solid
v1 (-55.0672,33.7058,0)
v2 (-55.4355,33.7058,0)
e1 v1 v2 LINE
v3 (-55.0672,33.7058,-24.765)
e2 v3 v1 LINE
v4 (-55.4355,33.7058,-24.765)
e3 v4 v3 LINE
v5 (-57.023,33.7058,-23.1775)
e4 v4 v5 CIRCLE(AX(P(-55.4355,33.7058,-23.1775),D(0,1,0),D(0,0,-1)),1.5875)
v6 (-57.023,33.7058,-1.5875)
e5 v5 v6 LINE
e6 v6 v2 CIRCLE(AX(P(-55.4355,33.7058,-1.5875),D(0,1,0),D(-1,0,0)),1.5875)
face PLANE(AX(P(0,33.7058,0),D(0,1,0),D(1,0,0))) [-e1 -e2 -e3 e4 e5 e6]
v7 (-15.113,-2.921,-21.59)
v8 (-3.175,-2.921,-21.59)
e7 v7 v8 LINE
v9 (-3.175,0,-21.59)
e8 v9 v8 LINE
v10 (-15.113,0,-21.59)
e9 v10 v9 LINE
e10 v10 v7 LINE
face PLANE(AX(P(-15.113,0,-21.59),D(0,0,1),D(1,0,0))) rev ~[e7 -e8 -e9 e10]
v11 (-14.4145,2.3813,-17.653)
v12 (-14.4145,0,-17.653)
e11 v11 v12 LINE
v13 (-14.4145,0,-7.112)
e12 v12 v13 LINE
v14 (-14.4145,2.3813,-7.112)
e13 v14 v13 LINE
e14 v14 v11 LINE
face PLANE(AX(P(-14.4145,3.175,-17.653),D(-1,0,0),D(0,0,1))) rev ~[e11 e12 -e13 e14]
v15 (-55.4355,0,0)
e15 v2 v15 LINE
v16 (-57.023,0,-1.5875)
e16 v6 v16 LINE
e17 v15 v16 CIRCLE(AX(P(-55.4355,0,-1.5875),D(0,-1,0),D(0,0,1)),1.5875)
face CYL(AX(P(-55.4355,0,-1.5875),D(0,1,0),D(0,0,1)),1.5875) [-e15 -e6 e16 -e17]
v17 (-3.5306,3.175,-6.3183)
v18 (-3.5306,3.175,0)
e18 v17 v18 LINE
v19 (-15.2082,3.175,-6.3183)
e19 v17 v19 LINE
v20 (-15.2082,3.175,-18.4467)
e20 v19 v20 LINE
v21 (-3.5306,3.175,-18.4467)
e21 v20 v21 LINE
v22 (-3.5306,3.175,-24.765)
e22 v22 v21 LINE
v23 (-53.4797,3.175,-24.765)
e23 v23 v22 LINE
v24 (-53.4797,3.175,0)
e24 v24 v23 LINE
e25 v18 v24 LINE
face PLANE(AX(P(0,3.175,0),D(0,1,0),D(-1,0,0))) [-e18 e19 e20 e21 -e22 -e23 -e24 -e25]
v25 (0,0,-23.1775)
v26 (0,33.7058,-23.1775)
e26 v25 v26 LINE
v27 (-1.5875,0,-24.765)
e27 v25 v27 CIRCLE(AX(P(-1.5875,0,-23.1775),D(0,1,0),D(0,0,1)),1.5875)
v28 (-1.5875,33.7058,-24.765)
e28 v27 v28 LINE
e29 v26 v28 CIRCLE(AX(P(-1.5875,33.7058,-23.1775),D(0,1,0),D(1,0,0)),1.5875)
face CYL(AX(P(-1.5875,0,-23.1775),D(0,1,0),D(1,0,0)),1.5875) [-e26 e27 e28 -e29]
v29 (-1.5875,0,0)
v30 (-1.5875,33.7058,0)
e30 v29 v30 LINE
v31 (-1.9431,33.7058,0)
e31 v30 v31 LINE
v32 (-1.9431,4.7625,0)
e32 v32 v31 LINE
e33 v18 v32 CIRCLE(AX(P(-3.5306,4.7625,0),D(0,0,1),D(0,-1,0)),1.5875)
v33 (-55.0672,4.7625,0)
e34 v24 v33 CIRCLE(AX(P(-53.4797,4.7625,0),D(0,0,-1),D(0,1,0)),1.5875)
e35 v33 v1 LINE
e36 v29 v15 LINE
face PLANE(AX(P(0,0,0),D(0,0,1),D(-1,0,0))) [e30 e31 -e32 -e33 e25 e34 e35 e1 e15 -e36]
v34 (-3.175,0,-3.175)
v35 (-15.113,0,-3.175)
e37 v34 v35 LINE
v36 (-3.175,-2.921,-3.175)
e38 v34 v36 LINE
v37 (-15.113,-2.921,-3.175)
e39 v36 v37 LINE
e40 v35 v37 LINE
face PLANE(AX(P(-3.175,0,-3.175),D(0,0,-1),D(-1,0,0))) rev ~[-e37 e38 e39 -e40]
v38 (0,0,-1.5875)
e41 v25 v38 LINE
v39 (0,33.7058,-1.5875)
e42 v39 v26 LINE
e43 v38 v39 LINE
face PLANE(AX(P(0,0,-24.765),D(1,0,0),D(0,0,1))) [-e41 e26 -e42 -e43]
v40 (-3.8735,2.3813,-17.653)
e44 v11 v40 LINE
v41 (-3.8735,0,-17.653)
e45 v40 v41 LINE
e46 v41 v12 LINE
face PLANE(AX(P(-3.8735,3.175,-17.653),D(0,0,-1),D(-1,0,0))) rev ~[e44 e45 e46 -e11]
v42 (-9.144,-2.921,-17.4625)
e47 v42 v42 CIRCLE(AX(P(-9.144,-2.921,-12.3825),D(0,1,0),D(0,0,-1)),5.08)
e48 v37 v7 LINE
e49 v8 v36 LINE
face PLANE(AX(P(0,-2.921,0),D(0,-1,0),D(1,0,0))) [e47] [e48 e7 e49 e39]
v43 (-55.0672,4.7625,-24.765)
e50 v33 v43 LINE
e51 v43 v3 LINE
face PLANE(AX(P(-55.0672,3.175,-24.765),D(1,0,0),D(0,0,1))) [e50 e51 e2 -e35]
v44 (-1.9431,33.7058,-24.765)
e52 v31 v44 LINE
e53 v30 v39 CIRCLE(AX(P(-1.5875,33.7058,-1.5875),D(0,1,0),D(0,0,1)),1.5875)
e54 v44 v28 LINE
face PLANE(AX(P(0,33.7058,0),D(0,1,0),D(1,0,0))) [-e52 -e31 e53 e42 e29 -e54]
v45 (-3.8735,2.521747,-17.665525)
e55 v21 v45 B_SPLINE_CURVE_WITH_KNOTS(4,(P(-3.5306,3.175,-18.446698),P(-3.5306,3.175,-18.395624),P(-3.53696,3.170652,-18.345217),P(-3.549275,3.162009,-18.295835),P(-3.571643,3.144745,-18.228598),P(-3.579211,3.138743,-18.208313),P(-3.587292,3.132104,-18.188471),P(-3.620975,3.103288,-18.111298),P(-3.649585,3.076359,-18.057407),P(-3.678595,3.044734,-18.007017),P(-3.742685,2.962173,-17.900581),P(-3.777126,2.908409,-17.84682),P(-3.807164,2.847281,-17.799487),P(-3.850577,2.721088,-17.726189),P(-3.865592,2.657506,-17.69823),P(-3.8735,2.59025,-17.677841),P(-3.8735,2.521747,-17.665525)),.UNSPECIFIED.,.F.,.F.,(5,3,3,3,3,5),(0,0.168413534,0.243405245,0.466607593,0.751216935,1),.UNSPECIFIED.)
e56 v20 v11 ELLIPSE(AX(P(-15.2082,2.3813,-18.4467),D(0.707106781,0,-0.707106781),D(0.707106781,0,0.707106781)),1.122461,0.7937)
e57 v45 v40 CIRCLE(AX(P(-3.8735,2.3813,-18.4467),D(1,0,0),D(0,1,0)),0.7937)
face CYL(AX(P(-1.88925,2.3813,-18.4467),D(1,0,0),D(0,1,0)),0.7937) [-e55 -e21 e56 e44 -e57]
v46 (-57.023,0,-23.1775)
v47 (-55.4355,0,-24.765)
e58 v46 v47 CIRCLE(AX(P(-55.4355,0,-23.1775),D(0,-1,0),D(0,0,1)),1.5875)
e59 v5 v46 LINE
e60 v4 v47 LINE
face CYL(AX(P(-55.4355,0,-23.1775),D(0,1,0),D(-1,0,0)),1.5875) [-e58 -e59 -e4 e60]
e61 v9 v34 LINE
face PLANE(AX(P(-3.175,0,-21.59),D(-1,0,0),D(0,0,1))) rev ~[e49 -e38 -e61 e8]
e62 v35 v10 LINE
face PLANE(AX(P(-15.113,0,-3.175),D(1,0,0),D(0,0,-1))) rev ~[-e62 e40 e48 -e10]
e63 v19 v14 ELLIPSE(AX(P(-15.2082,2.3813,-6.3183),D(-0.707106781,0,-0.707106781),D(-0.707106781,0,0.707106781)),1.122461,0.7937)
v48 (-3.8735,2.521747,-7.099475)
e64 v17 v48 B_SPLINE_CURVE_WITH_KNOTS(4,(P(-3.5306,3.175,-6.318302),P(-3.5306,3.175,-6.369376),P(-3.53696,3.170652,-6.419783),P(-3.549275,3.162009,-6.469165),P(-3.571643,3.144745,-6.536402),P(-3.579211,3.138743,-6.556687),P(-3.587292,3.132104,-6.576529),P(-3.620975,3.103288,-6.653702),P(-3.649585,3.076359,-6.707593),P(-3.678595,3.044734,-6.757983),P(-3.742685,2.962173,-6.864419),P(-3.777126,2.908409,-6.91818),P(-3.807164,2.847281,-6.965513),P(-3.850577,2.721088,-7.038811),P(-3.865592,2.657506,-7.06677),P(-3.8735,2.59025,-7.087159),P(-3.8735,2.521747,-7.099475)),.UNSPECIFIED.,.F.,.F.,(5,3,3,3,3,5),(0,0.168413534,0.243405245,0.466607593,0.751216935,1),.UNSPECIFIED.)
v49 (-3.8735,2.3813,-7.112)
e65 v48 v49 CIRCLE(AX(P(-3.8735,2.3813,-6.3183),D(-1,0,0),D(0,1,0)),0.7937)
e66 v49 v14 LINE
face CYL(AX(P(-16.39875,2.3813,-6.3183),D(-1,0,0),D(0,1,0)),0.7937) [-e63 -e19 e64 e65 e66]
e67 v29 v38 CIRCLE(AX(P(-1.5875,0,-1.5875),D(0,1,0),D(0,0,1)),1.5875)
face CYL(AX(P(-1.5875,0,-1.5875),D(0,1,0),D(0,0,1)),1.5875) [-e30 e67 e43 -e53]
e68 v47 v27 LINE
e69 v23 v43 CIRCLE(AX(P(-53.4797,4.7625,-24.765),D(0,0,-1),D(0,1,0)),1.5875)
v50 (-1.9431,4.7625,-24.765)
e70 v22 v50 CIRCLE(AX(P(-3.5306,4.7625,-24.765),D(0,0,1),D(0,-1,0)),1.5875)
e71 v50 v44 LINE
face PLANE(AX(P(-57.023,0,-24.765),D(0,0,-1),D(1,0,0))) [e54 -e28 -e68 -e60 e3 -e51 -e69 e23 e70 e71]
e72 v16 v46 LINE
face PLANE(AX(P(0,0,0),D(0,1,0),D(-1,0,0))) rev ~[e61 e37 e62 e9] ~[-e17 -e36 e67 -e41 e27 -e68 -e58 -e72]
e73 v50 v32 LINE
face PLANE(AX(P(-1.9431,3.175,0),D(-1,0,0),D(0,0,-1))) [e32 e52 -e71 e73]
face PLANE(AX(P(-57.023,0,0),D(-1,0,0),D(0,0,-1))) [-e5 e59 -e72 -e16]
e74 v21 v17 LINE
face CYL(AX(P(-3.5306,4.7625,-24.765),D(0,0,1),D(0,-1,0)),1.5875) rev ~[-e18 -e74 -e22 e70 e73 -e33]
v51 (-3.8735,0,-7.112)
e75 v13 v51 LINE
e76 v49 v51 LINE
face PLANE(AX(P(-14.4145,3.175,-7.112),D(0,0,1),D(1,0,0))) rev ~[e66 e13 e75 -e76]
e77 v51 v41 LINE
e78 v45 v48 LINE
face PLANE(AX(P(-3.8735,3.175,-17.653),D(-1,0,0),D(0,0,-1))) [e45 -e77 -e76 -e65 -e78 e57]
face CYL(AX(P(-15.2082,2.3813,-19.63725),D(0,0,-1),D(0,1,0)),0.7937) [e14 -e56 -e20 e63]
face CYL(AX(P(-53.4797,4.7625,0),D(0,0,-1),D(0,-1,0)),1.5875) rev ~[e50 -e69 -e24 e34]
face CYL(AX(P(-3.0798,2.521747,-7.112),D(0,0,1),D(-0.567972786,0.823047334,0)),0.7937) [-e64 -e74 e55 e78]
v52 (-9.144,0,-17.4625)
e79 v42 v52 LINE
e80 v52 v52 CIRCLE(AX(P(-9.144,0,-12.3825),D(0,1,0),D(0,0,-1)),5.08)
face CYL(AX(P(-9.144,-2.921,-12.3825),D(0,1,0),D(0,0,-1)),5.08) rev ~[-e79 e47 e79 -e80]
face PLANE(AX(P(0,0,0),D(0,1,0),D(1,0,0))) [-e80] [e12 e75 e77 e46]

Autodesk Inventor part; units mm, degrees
ref_plane "YZ Plane" through (0, 0, 0) normal (1, 0, 0) x (0, 1, 0)
ref_plane "XZ Plane" through (0, 0, 0) normal (0, 1, 0) x (-1, 0, 0)
ref_plane "XY Plane" through (0, 0, 0) normal (0, 0, 1) x (1, 0, 0)
sketch "Sketch1" plane through (0, 0, 0) normal (0, 1, 0) x (-1, 0, 0)
  line L0 (0, 0) -> (57.023, 0)
  line L1 (57.023, 0) -> (57.023, -24.765)
  line L2 (57.023, -24.765) -> (0, -24.765)
  line L3 (0, -24.765) -> (0, 0)
  dimension "d0" = 57.023
  dimension "d1" = 24.765
extrude "Extrusion1" add sketch "Sketch1" along normal blind 3.175
sketch "Sketch3" plane through (0, 0, 0) normal (0, -1, 0) x (1, 0, 0)
  line L0 (-3.175, -3.175) -> (-15.113, -3.175)
  line L1 (-15.113, -3.175) -> (-15.113, -21.59)
  line L2 (-15.113, -21.59) -> (-3.175, -21.59)
  line L3 (-3.175, -21.59) -> (-3.175, -3.175)
  line L4 (0, -24.765) -> (0, 0) projected
  line L5 (-57.023, 0) -> (0, 0) projected
  dimension "d18" = 18.415
  dimension "d19" = 11.938
  dimension "d20" = 3.175
  dimension "d21" = 3.175
extrude "Extrusion3" add sketch "Sketch3" along normal blind 2.921
fillet "Fillet2" radius 1.5875 4 edges at (0, 1.5875, -24.765) (0, 1.5875, 0) (-57.023, 1.5875, 0) (-57.023, 1.5875, -24.765)
hole "Hole2" at (-9.144, -2.921, -12.3825) direction (0, 1, 0) diameter 10.16 depth 25.4
sketch "Sketch4" plane through (0, 3.175, 0) normal (0, 1, 0) x (1, 0, 0)
  line L0 (-3.8735, 17.653) -> (-14.4145, 17.653)
  line L1 (-14.4145, 17.653) -> (-14.4145, 7.112)
  line L2 (-14.4145, 7.112) -> (-3.8735, 7.112)
  line L3 (-3.8735, 7.112) -> (-3.8735, 17.653)
  line L4 (-1.5875, 24.765) -> (-55.4355, 24.765) projected
  line L5 (0, 1.5875) -> (0, 23.1775) projected
  point P0 (0, 0)
  dimension "d34" = 10.541
  dimension "d35" = 10.541
  dimension "d36" = 7.112
  dimension "d37" = 3.8735
extrude "Extrusion4" cut sketch "Sketch4" against normal blind 3.175
sketch "Sketch5" plane through (0, 3.175, 0) normal (0, 1, 0) x (1, 0, 0)
  line L0 (0, 1.5875) -> (0, 23.1775) projected
  line L1 (-1.9431, 1.5875) -> (-1.9431, 23.1775)
  line L2 (-55.4355, 24.765) -> (-1.5875, 24.765) projected
  line L3 (-1.5875, 0) -> (-1.9431, 0)
  line L4 (-1.9431, 0) -> (-1.9431, 24.765)
  line L5 (-1.9431, 24.765) -> (-1.5875, 24.765)
  line L6 (0, 23.1775) -> (0, 1.5875)
  arc A0 (0, 23.1775) -> (-1.5875, 24.765) centre (-1.5875, 23.1775) ccw
  arc A1 (-1.5875, 0) -> (0, 1.5875) centre (-1.5875, 1.5875) ccw
  line L7 (-57.023, 23.1775) -> (-57.023, 1.5875) projected
  line L8 (-55.0672, 23.1775) -> (-55.0672, 1.5875)
  line L9 (-1.5875, 0) -> (-55.4355, 0) projected
  line L10 (-55.0672, 0) -> (-55.4355, 0)
  line L11 (-57.023, 1.5875) -> (-57.023, 23.1775)
  line L12 (-55.4355, 24.765) -> (-55.0672, 24.765)
  line L13 (-55.0672, 24.765) -> (-55.0672, 0)
  arc A2 (-57.023, 1.5875) -> (-55.4355, 0) centre (-55.4355, 1.5875) ccw
  arc A3 (-55.4355, 24.765) -> (-57.023, 23.1775) centre (-55.4355, 23.1775) ccw
  point P0 (0, 0)
  dimension "d40" = 1.9431
  dimension "d41" = 1.5875
  dimension "d42" = 1.9558
  dimension "d43" = 1.5875
extrude "Extrusion5" add sketch "Sketch5" along normal blind 30.5308 contours A1 L3 L4 L1 L2 A0 L0 | L9 A2 L7 A3 L2 L13 L8
fillet "Fillet3" radius 1.5875 2 edges at (-1.9431, 3.175, -12.3825) (-55.0672, 3.175, -12.3825)
fillet "Fillet4" radius 0.7937 4 edges at (-9.144, 3.175, -7.112) (-14.4145, 3.175, -12.3825) (-3.8735, 3.175, -12.3825) (-9.144, 3.175, -17.653)
properties part number "switch mount"
